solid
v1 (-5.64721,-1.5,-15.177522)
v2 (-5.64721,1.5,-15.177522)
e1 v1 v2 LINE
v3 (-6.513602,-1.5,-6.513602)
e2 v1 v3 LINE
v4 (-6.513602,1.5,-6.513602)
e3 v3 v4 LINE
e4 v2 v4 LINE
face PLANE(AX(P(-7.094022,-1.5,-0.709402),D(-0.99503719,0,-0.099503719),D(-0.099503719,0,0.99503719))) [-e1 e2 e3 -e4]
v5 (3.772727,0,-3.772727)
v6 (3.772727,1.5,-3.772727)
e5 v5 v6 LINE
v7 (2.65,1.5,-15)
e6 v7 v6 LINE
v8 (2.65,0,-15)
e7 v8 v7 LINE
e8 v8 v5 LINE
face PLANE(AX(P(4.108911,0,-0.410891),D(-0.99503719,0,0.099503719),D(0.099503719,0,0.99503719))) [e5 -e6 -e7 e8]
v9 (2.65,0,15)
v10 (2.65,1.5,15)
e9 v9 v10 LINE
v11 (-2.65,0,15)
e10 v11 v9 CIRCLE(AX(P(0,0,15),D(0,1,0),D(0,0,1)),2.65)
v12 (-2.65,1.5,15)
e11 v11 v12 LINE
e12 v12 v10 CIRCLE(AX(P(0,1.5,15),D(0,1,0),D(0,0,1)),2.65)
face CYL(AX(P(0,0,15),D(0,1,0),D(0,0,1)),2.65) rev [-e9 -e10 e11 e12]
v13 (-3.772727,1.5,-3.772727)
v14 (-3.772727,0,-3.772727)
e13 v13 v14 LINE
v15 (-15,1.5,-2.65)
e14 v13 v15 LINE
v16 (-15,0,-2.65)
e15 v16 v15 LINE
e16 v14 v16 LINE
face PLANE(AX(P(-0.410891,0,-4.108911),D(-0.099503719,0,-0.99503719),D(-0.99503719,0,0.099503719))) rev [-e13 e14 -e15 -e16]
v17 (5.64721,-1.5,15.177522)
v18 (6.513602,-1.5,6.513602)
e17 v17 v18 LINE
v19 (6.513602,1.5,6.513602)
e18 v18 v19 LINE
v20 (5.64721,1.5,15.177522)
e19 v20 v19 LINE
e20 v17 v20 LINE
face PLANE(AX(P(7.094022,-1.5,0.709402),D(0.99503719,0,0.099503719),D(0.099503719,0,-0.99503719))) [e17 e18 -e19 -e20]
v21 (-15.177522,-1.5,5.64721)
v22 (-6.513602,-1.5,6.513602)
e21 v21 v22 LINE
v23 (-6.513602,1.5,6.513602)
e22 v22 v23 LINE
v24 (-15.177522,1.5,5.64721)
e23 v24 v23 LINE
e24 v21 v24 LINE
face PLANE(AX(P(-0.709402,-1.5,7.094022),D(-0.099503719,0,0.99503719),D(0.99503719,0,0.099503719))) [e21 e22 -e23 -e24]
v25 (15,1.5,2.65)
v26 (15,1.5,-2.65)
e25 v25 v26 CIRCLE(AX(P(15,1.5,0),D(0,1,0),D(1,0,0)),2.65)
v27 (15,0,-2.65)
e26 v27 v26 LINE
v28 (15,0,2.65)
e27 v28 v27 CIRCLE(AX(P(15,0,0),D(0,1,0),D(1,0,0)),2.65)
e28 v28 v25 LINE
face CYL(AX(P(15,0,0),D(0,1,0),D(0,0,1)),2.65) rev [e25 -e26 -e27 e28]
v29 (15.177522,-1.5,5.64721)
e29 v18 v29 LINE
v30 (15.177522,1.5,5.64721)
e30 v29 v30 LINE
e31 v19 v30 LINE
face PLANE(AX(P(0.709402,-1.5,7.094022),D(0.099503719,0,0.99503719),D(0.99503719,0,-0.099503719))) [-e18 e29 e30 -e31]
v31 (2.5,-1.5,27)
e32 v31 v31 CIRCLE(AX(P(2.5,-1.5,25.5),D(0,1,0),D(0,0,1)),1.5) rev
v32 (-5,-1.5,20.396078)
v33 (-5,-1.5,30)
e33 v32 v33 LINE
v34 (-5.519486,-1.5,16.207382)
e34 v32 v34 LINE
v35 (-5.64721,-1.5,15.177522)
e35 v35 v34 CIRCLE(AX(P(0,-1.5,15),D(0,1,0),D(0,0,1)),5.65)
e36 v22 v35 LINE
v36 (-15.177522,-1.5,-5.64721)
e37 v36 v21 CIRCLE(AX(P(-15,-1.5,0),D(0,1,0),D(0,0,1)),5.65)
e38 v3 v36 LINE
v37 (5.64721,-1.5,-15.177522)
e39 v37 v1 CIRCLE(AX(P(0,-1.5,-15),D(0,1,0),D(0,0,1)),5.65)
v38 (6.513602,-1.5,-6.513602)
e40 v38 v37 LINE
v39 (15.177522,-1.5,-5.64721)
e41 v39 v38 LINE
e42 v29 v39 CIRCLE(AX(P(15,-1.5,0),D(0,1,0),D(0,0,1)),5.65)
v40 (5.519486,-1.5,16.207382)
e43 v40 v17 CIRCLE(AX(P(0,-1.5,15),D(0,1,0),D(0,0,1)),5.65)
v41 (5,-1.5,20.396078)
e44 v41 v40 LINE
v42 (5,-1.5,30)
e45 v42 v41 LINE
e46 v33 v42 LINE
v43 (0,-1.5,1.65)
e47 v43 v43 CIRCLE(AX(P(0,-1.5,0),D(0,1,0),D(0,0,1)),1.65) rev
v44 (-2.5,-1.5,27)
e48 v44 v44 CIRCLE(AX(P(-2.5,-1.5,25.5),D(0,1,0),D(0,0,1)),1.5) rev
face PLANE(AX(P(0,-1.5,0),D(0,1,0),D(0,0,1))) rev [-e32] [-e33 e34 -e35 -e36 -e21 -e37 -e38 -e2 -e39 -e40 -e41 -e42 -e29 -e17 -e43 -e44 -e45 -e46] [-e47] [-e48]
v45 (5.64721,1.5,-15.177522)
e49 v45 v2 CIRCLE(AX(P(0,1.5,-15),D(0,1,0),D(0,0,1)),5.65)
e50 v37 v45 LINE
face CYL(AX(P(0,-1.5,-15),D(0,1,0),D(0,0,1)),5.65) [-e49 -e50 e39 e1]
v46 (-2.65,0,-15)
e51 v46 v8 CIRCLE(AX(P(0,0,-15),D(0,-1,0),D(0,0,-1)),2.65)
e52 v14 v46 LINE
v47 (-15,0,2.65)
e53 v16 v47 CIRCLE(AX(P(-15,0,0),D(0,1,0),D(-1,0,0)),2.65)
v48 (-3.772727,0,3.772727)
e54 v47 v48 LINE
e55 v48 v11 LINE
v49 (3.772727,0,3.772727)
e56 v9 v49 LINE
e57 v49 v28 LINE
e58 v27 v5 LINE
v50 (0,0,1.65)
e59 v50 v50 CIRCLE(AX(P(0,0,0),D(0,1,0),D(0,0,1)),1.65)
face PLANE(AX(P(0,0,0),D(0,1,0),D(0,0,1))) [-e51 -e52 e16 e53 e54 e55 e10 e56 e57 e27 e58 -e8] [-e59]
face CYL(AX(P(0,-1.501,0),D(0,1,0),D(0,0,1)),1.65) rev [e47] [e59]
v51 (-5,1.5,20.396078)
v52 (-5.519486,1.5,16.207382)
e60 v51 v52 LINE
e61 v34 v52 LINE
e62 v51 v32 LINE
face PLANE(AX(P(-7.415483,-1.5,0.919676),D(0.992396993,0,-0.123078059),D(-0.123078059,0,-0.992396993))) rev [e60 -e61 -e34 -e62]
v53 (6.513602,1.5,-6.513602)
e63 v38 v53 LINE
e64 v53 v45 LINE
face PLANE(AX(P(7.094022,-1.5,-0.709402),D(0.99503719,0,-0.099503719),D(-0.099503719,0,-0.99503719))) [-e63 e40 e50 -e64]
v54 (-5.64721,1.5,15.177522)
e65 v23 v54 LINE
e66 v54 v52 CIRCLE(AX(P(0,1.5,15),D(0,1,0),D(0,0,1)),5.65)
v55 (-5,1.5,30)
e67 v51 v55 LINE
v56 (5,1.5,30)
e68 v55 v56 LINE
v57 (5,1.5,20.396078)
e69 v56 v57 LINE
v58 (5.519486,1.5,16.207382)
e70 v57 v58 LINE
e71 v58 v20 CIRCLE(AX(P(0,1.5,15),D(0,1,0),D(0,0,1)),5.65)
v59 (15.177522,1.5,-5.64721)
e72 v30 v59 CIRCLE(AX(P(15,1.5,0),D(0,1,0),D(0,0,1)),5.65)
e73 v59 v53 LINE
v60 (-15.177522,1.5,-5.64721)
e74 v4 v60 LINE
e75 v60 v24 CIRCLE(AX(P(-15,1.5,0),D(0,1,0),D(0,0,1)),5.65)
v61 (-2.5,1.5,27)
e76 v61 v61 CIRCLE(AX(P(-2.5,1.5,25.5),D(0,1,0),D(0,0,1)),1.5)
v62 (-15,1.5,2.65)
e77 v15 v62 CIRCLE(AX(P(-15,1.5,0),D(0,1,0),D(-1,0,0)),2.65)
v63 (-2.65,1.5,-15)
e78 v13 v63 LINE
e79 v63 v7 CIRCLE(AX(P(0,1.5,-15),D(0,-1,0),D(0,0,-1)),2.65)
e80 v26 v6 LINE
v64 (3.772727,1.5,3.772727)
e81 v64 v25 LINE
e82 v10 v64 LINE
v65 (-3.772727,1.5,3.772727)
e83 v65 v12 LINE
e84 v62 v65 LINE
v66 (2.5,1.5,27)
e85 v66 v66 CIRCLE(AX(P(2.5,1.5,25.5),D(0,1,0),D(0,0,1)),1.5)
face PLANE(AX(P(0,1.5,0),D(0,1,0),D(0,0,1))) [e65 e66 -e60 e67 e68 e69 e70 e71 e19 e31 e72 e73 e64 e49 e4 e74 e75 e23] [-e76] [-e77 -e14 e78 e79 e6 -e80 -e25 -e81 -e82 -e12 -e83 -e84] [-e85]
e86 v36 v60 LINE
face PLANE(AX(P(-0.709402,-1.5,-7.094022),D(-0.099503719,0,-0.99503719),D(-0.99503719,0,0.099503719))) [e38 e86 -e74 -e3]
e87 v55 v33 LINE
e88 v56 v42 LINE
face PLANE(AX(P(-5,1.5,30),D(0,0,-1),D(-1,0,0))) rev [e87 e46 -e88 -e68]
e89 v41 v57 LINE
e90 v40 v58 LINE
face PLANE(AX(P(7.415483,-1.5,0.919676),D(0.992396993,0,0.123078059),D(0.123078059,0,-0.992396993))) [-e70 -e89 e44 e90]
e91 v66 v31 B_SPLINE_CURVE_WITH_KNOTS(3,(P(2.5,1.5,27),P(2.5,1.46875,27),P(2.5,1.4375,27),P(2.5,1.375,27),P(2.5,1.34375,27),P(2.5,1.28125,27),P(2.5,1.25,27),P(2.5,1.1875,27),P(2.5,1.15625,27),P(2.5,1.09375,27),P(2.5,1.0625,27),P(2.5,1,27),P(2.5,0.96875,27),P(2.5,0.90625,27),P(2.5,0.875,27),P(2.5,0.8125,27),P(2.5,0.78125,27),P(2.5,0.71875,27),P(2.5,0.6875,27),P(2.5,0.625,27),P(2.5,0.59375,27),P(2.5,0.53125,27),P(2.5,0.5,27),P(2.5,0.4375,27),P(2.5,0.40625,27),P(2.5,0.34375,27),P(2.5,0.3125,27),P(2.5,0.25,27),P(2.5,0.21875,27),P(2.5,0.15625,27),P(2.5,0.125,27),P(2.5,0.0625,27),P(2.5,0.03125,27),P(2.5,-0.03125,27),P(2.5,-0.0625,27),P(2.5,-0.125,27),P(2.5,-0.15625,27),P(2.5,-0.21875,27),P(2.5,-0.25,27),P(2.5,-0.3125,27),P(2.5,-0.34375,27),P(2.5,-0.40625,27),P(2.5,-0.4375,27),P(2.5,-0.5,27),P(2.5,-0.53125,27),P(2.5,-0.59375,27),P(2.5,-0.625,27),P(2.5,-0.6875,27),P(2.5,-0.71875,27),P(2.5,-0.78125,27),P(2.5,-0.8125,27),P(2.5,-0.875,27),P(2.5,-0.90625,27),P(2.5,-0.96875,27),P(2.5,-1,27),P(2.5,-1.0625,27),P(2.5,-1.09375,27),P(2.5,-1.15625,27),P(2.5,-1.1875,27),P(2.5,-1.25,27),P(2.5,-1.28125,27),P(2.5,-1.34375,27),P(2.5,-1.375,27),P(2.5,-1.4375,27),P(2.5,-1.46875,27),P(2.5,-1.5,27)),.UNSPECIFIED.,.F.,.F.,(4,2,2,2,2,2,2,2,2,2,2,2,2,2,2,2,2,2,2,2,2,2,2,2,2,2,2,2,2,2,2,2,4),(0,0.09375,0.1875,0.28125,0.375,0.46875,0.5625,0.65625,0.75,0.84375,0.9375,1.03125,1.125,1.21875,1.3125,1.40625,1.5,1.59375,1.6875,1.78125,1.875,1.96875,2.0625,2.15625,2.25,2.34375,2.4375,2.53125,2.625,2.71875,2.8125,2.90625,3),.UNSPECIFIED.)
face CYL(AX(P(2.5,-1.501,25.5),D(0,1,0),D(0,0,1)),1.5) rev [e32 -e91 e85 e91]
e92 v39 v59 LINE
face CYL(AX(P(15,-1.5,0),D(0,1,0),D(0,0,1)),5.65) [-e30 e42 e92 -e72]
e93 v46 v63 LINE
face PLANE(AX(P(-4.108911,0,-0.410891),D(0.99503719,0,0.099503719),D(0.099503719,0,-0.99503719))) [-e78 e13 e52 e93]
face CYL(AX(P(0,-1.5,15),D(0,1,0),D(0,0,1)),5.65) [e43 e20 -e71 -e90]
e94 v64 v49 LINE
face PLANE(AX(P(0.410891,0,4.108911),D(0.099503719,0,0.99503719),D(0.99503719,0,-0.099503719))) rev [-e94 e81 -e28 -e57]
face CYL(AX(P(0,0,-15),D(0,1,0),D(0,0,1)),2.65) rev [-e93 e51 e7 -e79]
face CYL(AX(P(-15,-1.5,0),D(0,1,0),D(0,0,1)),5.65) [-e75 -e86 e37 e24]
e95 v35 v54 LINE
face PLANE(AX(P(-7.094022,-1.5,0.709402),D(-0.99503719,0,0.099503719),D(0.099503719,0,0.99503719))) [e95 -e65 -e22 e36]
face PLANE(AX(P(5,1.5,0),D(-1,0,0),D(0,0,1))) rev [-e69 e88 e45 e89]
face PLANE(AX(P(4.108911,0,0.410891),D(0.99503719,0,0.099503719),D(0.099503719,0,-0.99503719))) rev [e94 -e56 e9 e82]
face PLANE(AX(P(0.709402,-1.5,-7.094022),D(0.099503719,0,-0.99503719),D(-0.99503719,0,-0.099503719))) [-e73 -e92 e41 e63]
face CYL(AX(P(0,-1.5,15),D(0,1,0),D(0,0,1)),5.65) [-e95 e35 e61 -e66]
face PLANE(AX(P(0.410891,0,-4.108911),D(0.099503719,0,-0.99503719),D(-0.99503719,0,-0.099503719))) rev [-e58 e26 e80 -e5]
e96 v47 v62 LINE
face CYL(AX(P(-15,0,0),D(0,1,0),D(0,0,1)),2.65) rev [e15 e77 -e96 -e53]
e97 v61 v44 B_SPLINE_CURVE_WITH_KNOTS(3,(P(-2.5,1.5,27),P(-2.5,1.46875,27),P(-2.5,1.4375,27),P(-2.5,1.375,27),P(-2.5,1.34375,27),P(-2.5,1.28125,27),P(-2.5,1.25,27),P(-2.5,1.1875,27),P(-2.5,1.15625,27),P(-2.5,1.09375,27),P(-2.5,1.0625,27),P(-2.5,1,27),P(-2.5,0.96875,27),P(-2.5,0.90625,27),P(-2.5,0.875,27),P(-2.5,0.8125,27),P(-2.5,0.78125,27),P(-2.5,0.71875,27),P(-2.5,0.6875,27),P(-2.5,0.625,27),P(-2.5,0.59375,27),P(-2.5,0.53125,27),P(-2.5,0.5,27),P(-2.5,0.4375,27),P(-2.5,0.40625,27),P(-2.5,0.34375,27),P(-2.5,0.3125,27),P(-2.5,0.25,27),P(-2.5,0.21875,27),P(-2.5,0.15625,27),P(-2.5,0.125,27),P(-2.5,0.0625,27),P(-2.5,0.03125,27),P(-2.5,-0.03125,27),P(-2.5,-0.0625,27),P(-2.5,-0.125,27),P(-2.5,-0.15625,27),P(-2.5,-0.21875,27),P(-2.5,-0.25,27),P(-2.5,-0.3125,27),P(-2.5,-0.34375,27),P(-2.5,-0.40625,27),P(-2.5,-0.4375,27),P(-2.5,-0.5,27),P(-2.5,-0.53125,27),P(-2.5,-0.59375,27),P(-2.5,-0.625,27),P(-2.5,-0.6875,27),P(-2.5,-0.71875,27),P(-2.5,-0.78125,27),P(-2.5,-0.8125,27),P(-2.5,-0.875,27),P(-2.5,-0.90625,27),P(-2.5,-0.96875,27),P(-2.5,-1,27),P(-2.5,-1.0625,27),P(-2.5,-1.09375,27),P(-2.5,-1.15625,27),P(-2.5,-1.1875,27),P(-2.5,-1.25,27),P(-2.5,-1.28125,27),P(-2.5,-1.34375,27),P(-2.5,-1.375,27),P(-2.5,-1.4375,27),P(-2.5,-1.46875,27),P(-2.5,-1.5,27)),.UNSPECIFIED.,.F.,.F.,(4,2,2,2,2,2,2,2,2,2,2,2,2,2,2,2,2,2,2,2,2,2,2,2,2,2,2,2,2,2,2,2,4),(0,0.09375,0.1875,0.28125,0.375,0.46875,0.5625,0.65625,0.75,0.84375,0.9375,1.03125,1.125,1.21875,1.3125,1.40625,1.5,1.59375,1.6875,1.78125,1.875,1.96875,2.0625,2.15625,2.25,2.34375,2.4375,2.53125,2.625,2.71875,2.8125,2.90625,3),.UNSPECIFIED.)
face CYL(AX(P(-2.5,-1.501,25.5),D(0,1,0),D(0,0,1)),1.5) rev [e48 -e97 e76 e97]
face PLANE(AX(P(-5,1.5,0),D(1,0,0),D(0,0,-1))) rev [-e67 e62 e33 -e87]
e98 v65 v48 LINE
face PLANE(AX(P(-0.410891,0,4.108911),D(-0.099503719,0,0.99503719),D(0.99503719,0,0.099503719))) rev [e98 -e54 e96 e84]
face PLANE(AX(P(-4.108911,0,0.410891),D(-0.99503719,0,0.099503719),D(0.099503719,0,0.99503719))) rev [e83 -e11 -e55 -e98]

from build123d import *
from build123d.topology import SkipClean

# Parameters (mm, degrees)
SKETCH1_R               = 21
BOSS_EXTRUDE1_DEPTH     = 1.5
SKETCH2_R               = 2.65
CUT_EXTRUDE1_DEPTH      = 1.5
SKETCH5_W               = 10
SKETCH5_H               = 30
BOSS_EXTRUDE2_DEPTH     = 1.5
CIRPATTERN1_DEPTH       = 1.5
CUT_EXTRUDE4_REACH      = 38.65
SKETCH4_R               = 1.65
CUT_EXTRUDE5_REACH      = 38.742
SKETCH6_R               = 1.5
CUT_EXTRUDE6_DEPTH      = 37.650375169
CUT_EXTRUDE6_DEPTH_BACK = 37.650375169


# Read off the part's stored shape, not the designer's step: CirPattern1
with BuildPart() as part:
    # Sketch1 → Boss-Extrude1 (new, symmetric)
    with BuildSketch(Plane(origin=(0, 0, 0), x_dir=(1, 0, 0), z_dir=(0, 1, 0))):
        with Locations(Location((0, 0, 0), (0, 0, 270))):
            Circle(SKETCH1_R)
    extrude(amount=BOSS_EXTRUDE1_DEPTH, both=True)

    # Sketch2 → Cut-Extrude1 (cut)
    with BuildSketch(Plane(origin=(0, 1.5, 0), x_dir=(1, 0, 0), z_dir=(0, 1, 0))):
        with Locations((0, -15)):
            Circle(SKETCH2_R)
        with BuildLine():
            ThreePointArc((-2.65, -15), (0, -12.35), (2.65, -15))
            Line((2.65, -15), (4.067821782, -0.821782178))
            ThreePointArc((4.067821782, -0.821782178), (0, -4.15), (-4.067821782, -0.821782178))
            Line((-4.067821782, -0.821782178), (-2.65, -15))
        make_face()
        with BuildLine():
            ThreePointArc((-4.067821782, -0.821782178), (0, -4.15), (4.067821782, -0.821782178))
            Line((4.067821782, -0.821782178), (4.15, 0))
            ThreePointArc((4.15, 0), (0, 4.15), (-4.15, 0))
            Line((-4.15, 0), (-4.067821782, -0.821782178))
        make_face()
    cut_extrude1 = extrude(amount=-CUT_EXTRUDE1_DEPTH, mode=Mode.SUBTRACT)

    # Sketch5 → Boss-Extrude2 (add, symmetric)
    with BuildSketch(Plane(origin=(0, 0, 0), x_dir=(1, 0, 0), z_dir=(0, 1, 0))):
        with Locations((0, -15)):
            Rectangle(SKETCH5_W, SKETCH5_H)
    extrude(amount=BOSS_EXTRUDE2_DEPTH, both=True)

    # Mirror1: Cut-Extrude1 across plane
    with SkipClean():  # the faces are left unmerged after this step: merging them gives an invalid solid
        add(cut_extrude1.mirror(Plane.XY), mode=Mode.SUBTRACT)

    # CirPattern1 outline → CirPattern1 (cut)
    with BuildSketch(Plane(origin=(0, 0, 0), x_dir=(1, 0, 0), z_dir=(0, 1, 0))):
        with BuildLine():
            Line((3.772727273, -3.772727273), (15, -2.65))
            ThreePointArc((15, -2.65), (17.65, 0), (15, 2.65))
            Line((15, 2.65), (3.772727273, 3.772727273))
            Line((3.772727273, 3.772727273), (4.067821782, 0.821782178))
            ThreePointArc((4.067821782, 0.821782178), (0, -4.15), (-4.067821782, 0.821782178))
            Line((-4.067821782, 0.821782178), (-3.772727273, 3.772727273))
            Line((-3.772727273, 3.772727273), (-15, 2.65))
            ThreePointArc((-15, 2.65), (-17.65, 0), (-15, -2.65))
            Line((-15, -2.65), (-3.772727273, -3.772727273))
            Line((-3.772727273, -3.772727273), (-2.65, -15))
            ThreePointArc((-2.65, -15), (0, -17.65), (2.65, -15))
            Line((2.65, -15), (3.772727273, -3.772727273))
        make_face()
    extrude(amount=CIRPATTERN1_DEPTH, mode=Mode.SUBTRACT)

    # Sketch4 → Cut-Extrude4 (cut, up to next)
    with BuildSketch(Plane(origin=(0, 0, 0), x_dir=(1, 0, 0), z_dir=(0, 1, 0)), mode=Mode.PRIVATE) as cut_extrude4_sk1:
        with Locations(Location((0, 0, 0), (0, 0, 270))):
            Circle(SKETCH4_R)
    cut_extrude4_tool1 = extrude(cut_extrude4_sk1.sketch, amount=-CUT_EXTRUDE4_REACH, mode=Mode.PRIVATE) & part.part
    add(cut_extrude4_tool1.solids().sort_by_distance((0, 0, 0))[0], mode=Mode.SUBTRACT)

    # Sketch6 → Cut-Extrude5 (cut, up to next)
    with BuildSketch(Plane(origin=(0, 1.5, 0), x_dir=(1, 0, 0), z_dir=(0, 1, 0)), mode=Mode.PRIVATE) as cut_extrude5_sk1:
        with Locations(Location((2.5, -25.5, 0), (0, 0, 270))):
            Circle(SKETCH6_R)
    cut_extrude5_tool1 = extrude(cut_extrude5_sk1.sketch, amount=-CUT_EXTRUDE5_REACH, mode=Mode.PRIVATE) & part.part
    # Sketch6 → Cut-Extrude5 (cut, up to next)
    with BuildSketch(Plane(origin=(0, 1.5, 0), x_dir=(1, 0, 0), z_dir=(0, 1, 0)), mode=Mode.PRIVATE) as cut_extrude5_sk2:
        with Locations(Location((-2.5, -25.5, 0), (0, 0, 270))):
            Circle(SKETCH6_R)
    cut_extrude5_tool2 = extrude(cut_extrude5_sk2.sketch, amount=-CUT_EXTRUDE5_REACH, mode=Mode.PRIVATE) & part.part
    add(cut_extrude5_tool1.solids().sort_by_distance((2.5, 1.5, 25.5))[0], mode=Mode.SUBTRACT)
    add(cut_extrude5_tool2.solids().sort_by_distance((-2.5, 1.5, 25.5))[0], mode=Mode.SUBTRACT)

    # Sketch7 → Cut-Extrude6 (cut, two sides: drawn at the far end of the back side and taken through both)
    with BuildSketch(Plane(origin=(0, 0, 0), x_dir=(1, 0, 0), z_dir=(0, 1, 0)).offset(-CUT_EXTRUDE6_DEPTH_BACK)):
        with BuildLine():
            ThreePointArc((5, -20.396078054), (0, 21), (-5, -20.396078054))
            Line((-5, -20.396078054), (-5.519486194, -16.207382355))
            ThreePointArc((-5.519486194, -16.207382355), (-5.607043009, -15.695391034), (-5.647210443, -15.177522436))
            Line((-5.647210443, -15.177522436), (-6.513602442, -6.513602442))
            Line((-6.513602442, -6.513602442), (-15.177522436, -5.647210443))
            ThreePointArc((-15.177522436, -5.647210443), (-20.65, 0), (-15.177522436, 5.647210443))
            Line((-15.177522436, 5.647210443), (-6.513602442, 6.513602442))
            Line((-6.513602442, 6.513602442), (-5.647210443, 15.177522436))
            ThreePointArc((-5.647210443, 15.177522436), (0, 20.65), (5.647210443, 15.177522436))
            Line((5.647210443, 15.177522436), (6.513602442, 6.513602442))
            Line((6.513602442, 6.513602442), (15.177522436, 5.647210443))
            ThreePointArc((15.177522436, 5.647210443), (20.65, 0), (15.177522436, -5.647210443))
            Line((15.177522436, -5.647210443), (6.513602442, -6.513602442))
            Line((6.513602442, -6.513602442), (5.647210443, -15.177522436))
            ThreePointArc((5.647210443, -15.177522436), (5.607043009, -15.695391034), (5.519486194, -16.207382355))
            Line((5.519486194, -16.207382355), (5, -20.396078054))
        make_face()
    extrude(amount=CUT_EXTRUDE6_DEPTH + CUT_EXTRUDE6_DEPTH_BACK, mode=Mode.SUBTRACT)


solid = part.part
